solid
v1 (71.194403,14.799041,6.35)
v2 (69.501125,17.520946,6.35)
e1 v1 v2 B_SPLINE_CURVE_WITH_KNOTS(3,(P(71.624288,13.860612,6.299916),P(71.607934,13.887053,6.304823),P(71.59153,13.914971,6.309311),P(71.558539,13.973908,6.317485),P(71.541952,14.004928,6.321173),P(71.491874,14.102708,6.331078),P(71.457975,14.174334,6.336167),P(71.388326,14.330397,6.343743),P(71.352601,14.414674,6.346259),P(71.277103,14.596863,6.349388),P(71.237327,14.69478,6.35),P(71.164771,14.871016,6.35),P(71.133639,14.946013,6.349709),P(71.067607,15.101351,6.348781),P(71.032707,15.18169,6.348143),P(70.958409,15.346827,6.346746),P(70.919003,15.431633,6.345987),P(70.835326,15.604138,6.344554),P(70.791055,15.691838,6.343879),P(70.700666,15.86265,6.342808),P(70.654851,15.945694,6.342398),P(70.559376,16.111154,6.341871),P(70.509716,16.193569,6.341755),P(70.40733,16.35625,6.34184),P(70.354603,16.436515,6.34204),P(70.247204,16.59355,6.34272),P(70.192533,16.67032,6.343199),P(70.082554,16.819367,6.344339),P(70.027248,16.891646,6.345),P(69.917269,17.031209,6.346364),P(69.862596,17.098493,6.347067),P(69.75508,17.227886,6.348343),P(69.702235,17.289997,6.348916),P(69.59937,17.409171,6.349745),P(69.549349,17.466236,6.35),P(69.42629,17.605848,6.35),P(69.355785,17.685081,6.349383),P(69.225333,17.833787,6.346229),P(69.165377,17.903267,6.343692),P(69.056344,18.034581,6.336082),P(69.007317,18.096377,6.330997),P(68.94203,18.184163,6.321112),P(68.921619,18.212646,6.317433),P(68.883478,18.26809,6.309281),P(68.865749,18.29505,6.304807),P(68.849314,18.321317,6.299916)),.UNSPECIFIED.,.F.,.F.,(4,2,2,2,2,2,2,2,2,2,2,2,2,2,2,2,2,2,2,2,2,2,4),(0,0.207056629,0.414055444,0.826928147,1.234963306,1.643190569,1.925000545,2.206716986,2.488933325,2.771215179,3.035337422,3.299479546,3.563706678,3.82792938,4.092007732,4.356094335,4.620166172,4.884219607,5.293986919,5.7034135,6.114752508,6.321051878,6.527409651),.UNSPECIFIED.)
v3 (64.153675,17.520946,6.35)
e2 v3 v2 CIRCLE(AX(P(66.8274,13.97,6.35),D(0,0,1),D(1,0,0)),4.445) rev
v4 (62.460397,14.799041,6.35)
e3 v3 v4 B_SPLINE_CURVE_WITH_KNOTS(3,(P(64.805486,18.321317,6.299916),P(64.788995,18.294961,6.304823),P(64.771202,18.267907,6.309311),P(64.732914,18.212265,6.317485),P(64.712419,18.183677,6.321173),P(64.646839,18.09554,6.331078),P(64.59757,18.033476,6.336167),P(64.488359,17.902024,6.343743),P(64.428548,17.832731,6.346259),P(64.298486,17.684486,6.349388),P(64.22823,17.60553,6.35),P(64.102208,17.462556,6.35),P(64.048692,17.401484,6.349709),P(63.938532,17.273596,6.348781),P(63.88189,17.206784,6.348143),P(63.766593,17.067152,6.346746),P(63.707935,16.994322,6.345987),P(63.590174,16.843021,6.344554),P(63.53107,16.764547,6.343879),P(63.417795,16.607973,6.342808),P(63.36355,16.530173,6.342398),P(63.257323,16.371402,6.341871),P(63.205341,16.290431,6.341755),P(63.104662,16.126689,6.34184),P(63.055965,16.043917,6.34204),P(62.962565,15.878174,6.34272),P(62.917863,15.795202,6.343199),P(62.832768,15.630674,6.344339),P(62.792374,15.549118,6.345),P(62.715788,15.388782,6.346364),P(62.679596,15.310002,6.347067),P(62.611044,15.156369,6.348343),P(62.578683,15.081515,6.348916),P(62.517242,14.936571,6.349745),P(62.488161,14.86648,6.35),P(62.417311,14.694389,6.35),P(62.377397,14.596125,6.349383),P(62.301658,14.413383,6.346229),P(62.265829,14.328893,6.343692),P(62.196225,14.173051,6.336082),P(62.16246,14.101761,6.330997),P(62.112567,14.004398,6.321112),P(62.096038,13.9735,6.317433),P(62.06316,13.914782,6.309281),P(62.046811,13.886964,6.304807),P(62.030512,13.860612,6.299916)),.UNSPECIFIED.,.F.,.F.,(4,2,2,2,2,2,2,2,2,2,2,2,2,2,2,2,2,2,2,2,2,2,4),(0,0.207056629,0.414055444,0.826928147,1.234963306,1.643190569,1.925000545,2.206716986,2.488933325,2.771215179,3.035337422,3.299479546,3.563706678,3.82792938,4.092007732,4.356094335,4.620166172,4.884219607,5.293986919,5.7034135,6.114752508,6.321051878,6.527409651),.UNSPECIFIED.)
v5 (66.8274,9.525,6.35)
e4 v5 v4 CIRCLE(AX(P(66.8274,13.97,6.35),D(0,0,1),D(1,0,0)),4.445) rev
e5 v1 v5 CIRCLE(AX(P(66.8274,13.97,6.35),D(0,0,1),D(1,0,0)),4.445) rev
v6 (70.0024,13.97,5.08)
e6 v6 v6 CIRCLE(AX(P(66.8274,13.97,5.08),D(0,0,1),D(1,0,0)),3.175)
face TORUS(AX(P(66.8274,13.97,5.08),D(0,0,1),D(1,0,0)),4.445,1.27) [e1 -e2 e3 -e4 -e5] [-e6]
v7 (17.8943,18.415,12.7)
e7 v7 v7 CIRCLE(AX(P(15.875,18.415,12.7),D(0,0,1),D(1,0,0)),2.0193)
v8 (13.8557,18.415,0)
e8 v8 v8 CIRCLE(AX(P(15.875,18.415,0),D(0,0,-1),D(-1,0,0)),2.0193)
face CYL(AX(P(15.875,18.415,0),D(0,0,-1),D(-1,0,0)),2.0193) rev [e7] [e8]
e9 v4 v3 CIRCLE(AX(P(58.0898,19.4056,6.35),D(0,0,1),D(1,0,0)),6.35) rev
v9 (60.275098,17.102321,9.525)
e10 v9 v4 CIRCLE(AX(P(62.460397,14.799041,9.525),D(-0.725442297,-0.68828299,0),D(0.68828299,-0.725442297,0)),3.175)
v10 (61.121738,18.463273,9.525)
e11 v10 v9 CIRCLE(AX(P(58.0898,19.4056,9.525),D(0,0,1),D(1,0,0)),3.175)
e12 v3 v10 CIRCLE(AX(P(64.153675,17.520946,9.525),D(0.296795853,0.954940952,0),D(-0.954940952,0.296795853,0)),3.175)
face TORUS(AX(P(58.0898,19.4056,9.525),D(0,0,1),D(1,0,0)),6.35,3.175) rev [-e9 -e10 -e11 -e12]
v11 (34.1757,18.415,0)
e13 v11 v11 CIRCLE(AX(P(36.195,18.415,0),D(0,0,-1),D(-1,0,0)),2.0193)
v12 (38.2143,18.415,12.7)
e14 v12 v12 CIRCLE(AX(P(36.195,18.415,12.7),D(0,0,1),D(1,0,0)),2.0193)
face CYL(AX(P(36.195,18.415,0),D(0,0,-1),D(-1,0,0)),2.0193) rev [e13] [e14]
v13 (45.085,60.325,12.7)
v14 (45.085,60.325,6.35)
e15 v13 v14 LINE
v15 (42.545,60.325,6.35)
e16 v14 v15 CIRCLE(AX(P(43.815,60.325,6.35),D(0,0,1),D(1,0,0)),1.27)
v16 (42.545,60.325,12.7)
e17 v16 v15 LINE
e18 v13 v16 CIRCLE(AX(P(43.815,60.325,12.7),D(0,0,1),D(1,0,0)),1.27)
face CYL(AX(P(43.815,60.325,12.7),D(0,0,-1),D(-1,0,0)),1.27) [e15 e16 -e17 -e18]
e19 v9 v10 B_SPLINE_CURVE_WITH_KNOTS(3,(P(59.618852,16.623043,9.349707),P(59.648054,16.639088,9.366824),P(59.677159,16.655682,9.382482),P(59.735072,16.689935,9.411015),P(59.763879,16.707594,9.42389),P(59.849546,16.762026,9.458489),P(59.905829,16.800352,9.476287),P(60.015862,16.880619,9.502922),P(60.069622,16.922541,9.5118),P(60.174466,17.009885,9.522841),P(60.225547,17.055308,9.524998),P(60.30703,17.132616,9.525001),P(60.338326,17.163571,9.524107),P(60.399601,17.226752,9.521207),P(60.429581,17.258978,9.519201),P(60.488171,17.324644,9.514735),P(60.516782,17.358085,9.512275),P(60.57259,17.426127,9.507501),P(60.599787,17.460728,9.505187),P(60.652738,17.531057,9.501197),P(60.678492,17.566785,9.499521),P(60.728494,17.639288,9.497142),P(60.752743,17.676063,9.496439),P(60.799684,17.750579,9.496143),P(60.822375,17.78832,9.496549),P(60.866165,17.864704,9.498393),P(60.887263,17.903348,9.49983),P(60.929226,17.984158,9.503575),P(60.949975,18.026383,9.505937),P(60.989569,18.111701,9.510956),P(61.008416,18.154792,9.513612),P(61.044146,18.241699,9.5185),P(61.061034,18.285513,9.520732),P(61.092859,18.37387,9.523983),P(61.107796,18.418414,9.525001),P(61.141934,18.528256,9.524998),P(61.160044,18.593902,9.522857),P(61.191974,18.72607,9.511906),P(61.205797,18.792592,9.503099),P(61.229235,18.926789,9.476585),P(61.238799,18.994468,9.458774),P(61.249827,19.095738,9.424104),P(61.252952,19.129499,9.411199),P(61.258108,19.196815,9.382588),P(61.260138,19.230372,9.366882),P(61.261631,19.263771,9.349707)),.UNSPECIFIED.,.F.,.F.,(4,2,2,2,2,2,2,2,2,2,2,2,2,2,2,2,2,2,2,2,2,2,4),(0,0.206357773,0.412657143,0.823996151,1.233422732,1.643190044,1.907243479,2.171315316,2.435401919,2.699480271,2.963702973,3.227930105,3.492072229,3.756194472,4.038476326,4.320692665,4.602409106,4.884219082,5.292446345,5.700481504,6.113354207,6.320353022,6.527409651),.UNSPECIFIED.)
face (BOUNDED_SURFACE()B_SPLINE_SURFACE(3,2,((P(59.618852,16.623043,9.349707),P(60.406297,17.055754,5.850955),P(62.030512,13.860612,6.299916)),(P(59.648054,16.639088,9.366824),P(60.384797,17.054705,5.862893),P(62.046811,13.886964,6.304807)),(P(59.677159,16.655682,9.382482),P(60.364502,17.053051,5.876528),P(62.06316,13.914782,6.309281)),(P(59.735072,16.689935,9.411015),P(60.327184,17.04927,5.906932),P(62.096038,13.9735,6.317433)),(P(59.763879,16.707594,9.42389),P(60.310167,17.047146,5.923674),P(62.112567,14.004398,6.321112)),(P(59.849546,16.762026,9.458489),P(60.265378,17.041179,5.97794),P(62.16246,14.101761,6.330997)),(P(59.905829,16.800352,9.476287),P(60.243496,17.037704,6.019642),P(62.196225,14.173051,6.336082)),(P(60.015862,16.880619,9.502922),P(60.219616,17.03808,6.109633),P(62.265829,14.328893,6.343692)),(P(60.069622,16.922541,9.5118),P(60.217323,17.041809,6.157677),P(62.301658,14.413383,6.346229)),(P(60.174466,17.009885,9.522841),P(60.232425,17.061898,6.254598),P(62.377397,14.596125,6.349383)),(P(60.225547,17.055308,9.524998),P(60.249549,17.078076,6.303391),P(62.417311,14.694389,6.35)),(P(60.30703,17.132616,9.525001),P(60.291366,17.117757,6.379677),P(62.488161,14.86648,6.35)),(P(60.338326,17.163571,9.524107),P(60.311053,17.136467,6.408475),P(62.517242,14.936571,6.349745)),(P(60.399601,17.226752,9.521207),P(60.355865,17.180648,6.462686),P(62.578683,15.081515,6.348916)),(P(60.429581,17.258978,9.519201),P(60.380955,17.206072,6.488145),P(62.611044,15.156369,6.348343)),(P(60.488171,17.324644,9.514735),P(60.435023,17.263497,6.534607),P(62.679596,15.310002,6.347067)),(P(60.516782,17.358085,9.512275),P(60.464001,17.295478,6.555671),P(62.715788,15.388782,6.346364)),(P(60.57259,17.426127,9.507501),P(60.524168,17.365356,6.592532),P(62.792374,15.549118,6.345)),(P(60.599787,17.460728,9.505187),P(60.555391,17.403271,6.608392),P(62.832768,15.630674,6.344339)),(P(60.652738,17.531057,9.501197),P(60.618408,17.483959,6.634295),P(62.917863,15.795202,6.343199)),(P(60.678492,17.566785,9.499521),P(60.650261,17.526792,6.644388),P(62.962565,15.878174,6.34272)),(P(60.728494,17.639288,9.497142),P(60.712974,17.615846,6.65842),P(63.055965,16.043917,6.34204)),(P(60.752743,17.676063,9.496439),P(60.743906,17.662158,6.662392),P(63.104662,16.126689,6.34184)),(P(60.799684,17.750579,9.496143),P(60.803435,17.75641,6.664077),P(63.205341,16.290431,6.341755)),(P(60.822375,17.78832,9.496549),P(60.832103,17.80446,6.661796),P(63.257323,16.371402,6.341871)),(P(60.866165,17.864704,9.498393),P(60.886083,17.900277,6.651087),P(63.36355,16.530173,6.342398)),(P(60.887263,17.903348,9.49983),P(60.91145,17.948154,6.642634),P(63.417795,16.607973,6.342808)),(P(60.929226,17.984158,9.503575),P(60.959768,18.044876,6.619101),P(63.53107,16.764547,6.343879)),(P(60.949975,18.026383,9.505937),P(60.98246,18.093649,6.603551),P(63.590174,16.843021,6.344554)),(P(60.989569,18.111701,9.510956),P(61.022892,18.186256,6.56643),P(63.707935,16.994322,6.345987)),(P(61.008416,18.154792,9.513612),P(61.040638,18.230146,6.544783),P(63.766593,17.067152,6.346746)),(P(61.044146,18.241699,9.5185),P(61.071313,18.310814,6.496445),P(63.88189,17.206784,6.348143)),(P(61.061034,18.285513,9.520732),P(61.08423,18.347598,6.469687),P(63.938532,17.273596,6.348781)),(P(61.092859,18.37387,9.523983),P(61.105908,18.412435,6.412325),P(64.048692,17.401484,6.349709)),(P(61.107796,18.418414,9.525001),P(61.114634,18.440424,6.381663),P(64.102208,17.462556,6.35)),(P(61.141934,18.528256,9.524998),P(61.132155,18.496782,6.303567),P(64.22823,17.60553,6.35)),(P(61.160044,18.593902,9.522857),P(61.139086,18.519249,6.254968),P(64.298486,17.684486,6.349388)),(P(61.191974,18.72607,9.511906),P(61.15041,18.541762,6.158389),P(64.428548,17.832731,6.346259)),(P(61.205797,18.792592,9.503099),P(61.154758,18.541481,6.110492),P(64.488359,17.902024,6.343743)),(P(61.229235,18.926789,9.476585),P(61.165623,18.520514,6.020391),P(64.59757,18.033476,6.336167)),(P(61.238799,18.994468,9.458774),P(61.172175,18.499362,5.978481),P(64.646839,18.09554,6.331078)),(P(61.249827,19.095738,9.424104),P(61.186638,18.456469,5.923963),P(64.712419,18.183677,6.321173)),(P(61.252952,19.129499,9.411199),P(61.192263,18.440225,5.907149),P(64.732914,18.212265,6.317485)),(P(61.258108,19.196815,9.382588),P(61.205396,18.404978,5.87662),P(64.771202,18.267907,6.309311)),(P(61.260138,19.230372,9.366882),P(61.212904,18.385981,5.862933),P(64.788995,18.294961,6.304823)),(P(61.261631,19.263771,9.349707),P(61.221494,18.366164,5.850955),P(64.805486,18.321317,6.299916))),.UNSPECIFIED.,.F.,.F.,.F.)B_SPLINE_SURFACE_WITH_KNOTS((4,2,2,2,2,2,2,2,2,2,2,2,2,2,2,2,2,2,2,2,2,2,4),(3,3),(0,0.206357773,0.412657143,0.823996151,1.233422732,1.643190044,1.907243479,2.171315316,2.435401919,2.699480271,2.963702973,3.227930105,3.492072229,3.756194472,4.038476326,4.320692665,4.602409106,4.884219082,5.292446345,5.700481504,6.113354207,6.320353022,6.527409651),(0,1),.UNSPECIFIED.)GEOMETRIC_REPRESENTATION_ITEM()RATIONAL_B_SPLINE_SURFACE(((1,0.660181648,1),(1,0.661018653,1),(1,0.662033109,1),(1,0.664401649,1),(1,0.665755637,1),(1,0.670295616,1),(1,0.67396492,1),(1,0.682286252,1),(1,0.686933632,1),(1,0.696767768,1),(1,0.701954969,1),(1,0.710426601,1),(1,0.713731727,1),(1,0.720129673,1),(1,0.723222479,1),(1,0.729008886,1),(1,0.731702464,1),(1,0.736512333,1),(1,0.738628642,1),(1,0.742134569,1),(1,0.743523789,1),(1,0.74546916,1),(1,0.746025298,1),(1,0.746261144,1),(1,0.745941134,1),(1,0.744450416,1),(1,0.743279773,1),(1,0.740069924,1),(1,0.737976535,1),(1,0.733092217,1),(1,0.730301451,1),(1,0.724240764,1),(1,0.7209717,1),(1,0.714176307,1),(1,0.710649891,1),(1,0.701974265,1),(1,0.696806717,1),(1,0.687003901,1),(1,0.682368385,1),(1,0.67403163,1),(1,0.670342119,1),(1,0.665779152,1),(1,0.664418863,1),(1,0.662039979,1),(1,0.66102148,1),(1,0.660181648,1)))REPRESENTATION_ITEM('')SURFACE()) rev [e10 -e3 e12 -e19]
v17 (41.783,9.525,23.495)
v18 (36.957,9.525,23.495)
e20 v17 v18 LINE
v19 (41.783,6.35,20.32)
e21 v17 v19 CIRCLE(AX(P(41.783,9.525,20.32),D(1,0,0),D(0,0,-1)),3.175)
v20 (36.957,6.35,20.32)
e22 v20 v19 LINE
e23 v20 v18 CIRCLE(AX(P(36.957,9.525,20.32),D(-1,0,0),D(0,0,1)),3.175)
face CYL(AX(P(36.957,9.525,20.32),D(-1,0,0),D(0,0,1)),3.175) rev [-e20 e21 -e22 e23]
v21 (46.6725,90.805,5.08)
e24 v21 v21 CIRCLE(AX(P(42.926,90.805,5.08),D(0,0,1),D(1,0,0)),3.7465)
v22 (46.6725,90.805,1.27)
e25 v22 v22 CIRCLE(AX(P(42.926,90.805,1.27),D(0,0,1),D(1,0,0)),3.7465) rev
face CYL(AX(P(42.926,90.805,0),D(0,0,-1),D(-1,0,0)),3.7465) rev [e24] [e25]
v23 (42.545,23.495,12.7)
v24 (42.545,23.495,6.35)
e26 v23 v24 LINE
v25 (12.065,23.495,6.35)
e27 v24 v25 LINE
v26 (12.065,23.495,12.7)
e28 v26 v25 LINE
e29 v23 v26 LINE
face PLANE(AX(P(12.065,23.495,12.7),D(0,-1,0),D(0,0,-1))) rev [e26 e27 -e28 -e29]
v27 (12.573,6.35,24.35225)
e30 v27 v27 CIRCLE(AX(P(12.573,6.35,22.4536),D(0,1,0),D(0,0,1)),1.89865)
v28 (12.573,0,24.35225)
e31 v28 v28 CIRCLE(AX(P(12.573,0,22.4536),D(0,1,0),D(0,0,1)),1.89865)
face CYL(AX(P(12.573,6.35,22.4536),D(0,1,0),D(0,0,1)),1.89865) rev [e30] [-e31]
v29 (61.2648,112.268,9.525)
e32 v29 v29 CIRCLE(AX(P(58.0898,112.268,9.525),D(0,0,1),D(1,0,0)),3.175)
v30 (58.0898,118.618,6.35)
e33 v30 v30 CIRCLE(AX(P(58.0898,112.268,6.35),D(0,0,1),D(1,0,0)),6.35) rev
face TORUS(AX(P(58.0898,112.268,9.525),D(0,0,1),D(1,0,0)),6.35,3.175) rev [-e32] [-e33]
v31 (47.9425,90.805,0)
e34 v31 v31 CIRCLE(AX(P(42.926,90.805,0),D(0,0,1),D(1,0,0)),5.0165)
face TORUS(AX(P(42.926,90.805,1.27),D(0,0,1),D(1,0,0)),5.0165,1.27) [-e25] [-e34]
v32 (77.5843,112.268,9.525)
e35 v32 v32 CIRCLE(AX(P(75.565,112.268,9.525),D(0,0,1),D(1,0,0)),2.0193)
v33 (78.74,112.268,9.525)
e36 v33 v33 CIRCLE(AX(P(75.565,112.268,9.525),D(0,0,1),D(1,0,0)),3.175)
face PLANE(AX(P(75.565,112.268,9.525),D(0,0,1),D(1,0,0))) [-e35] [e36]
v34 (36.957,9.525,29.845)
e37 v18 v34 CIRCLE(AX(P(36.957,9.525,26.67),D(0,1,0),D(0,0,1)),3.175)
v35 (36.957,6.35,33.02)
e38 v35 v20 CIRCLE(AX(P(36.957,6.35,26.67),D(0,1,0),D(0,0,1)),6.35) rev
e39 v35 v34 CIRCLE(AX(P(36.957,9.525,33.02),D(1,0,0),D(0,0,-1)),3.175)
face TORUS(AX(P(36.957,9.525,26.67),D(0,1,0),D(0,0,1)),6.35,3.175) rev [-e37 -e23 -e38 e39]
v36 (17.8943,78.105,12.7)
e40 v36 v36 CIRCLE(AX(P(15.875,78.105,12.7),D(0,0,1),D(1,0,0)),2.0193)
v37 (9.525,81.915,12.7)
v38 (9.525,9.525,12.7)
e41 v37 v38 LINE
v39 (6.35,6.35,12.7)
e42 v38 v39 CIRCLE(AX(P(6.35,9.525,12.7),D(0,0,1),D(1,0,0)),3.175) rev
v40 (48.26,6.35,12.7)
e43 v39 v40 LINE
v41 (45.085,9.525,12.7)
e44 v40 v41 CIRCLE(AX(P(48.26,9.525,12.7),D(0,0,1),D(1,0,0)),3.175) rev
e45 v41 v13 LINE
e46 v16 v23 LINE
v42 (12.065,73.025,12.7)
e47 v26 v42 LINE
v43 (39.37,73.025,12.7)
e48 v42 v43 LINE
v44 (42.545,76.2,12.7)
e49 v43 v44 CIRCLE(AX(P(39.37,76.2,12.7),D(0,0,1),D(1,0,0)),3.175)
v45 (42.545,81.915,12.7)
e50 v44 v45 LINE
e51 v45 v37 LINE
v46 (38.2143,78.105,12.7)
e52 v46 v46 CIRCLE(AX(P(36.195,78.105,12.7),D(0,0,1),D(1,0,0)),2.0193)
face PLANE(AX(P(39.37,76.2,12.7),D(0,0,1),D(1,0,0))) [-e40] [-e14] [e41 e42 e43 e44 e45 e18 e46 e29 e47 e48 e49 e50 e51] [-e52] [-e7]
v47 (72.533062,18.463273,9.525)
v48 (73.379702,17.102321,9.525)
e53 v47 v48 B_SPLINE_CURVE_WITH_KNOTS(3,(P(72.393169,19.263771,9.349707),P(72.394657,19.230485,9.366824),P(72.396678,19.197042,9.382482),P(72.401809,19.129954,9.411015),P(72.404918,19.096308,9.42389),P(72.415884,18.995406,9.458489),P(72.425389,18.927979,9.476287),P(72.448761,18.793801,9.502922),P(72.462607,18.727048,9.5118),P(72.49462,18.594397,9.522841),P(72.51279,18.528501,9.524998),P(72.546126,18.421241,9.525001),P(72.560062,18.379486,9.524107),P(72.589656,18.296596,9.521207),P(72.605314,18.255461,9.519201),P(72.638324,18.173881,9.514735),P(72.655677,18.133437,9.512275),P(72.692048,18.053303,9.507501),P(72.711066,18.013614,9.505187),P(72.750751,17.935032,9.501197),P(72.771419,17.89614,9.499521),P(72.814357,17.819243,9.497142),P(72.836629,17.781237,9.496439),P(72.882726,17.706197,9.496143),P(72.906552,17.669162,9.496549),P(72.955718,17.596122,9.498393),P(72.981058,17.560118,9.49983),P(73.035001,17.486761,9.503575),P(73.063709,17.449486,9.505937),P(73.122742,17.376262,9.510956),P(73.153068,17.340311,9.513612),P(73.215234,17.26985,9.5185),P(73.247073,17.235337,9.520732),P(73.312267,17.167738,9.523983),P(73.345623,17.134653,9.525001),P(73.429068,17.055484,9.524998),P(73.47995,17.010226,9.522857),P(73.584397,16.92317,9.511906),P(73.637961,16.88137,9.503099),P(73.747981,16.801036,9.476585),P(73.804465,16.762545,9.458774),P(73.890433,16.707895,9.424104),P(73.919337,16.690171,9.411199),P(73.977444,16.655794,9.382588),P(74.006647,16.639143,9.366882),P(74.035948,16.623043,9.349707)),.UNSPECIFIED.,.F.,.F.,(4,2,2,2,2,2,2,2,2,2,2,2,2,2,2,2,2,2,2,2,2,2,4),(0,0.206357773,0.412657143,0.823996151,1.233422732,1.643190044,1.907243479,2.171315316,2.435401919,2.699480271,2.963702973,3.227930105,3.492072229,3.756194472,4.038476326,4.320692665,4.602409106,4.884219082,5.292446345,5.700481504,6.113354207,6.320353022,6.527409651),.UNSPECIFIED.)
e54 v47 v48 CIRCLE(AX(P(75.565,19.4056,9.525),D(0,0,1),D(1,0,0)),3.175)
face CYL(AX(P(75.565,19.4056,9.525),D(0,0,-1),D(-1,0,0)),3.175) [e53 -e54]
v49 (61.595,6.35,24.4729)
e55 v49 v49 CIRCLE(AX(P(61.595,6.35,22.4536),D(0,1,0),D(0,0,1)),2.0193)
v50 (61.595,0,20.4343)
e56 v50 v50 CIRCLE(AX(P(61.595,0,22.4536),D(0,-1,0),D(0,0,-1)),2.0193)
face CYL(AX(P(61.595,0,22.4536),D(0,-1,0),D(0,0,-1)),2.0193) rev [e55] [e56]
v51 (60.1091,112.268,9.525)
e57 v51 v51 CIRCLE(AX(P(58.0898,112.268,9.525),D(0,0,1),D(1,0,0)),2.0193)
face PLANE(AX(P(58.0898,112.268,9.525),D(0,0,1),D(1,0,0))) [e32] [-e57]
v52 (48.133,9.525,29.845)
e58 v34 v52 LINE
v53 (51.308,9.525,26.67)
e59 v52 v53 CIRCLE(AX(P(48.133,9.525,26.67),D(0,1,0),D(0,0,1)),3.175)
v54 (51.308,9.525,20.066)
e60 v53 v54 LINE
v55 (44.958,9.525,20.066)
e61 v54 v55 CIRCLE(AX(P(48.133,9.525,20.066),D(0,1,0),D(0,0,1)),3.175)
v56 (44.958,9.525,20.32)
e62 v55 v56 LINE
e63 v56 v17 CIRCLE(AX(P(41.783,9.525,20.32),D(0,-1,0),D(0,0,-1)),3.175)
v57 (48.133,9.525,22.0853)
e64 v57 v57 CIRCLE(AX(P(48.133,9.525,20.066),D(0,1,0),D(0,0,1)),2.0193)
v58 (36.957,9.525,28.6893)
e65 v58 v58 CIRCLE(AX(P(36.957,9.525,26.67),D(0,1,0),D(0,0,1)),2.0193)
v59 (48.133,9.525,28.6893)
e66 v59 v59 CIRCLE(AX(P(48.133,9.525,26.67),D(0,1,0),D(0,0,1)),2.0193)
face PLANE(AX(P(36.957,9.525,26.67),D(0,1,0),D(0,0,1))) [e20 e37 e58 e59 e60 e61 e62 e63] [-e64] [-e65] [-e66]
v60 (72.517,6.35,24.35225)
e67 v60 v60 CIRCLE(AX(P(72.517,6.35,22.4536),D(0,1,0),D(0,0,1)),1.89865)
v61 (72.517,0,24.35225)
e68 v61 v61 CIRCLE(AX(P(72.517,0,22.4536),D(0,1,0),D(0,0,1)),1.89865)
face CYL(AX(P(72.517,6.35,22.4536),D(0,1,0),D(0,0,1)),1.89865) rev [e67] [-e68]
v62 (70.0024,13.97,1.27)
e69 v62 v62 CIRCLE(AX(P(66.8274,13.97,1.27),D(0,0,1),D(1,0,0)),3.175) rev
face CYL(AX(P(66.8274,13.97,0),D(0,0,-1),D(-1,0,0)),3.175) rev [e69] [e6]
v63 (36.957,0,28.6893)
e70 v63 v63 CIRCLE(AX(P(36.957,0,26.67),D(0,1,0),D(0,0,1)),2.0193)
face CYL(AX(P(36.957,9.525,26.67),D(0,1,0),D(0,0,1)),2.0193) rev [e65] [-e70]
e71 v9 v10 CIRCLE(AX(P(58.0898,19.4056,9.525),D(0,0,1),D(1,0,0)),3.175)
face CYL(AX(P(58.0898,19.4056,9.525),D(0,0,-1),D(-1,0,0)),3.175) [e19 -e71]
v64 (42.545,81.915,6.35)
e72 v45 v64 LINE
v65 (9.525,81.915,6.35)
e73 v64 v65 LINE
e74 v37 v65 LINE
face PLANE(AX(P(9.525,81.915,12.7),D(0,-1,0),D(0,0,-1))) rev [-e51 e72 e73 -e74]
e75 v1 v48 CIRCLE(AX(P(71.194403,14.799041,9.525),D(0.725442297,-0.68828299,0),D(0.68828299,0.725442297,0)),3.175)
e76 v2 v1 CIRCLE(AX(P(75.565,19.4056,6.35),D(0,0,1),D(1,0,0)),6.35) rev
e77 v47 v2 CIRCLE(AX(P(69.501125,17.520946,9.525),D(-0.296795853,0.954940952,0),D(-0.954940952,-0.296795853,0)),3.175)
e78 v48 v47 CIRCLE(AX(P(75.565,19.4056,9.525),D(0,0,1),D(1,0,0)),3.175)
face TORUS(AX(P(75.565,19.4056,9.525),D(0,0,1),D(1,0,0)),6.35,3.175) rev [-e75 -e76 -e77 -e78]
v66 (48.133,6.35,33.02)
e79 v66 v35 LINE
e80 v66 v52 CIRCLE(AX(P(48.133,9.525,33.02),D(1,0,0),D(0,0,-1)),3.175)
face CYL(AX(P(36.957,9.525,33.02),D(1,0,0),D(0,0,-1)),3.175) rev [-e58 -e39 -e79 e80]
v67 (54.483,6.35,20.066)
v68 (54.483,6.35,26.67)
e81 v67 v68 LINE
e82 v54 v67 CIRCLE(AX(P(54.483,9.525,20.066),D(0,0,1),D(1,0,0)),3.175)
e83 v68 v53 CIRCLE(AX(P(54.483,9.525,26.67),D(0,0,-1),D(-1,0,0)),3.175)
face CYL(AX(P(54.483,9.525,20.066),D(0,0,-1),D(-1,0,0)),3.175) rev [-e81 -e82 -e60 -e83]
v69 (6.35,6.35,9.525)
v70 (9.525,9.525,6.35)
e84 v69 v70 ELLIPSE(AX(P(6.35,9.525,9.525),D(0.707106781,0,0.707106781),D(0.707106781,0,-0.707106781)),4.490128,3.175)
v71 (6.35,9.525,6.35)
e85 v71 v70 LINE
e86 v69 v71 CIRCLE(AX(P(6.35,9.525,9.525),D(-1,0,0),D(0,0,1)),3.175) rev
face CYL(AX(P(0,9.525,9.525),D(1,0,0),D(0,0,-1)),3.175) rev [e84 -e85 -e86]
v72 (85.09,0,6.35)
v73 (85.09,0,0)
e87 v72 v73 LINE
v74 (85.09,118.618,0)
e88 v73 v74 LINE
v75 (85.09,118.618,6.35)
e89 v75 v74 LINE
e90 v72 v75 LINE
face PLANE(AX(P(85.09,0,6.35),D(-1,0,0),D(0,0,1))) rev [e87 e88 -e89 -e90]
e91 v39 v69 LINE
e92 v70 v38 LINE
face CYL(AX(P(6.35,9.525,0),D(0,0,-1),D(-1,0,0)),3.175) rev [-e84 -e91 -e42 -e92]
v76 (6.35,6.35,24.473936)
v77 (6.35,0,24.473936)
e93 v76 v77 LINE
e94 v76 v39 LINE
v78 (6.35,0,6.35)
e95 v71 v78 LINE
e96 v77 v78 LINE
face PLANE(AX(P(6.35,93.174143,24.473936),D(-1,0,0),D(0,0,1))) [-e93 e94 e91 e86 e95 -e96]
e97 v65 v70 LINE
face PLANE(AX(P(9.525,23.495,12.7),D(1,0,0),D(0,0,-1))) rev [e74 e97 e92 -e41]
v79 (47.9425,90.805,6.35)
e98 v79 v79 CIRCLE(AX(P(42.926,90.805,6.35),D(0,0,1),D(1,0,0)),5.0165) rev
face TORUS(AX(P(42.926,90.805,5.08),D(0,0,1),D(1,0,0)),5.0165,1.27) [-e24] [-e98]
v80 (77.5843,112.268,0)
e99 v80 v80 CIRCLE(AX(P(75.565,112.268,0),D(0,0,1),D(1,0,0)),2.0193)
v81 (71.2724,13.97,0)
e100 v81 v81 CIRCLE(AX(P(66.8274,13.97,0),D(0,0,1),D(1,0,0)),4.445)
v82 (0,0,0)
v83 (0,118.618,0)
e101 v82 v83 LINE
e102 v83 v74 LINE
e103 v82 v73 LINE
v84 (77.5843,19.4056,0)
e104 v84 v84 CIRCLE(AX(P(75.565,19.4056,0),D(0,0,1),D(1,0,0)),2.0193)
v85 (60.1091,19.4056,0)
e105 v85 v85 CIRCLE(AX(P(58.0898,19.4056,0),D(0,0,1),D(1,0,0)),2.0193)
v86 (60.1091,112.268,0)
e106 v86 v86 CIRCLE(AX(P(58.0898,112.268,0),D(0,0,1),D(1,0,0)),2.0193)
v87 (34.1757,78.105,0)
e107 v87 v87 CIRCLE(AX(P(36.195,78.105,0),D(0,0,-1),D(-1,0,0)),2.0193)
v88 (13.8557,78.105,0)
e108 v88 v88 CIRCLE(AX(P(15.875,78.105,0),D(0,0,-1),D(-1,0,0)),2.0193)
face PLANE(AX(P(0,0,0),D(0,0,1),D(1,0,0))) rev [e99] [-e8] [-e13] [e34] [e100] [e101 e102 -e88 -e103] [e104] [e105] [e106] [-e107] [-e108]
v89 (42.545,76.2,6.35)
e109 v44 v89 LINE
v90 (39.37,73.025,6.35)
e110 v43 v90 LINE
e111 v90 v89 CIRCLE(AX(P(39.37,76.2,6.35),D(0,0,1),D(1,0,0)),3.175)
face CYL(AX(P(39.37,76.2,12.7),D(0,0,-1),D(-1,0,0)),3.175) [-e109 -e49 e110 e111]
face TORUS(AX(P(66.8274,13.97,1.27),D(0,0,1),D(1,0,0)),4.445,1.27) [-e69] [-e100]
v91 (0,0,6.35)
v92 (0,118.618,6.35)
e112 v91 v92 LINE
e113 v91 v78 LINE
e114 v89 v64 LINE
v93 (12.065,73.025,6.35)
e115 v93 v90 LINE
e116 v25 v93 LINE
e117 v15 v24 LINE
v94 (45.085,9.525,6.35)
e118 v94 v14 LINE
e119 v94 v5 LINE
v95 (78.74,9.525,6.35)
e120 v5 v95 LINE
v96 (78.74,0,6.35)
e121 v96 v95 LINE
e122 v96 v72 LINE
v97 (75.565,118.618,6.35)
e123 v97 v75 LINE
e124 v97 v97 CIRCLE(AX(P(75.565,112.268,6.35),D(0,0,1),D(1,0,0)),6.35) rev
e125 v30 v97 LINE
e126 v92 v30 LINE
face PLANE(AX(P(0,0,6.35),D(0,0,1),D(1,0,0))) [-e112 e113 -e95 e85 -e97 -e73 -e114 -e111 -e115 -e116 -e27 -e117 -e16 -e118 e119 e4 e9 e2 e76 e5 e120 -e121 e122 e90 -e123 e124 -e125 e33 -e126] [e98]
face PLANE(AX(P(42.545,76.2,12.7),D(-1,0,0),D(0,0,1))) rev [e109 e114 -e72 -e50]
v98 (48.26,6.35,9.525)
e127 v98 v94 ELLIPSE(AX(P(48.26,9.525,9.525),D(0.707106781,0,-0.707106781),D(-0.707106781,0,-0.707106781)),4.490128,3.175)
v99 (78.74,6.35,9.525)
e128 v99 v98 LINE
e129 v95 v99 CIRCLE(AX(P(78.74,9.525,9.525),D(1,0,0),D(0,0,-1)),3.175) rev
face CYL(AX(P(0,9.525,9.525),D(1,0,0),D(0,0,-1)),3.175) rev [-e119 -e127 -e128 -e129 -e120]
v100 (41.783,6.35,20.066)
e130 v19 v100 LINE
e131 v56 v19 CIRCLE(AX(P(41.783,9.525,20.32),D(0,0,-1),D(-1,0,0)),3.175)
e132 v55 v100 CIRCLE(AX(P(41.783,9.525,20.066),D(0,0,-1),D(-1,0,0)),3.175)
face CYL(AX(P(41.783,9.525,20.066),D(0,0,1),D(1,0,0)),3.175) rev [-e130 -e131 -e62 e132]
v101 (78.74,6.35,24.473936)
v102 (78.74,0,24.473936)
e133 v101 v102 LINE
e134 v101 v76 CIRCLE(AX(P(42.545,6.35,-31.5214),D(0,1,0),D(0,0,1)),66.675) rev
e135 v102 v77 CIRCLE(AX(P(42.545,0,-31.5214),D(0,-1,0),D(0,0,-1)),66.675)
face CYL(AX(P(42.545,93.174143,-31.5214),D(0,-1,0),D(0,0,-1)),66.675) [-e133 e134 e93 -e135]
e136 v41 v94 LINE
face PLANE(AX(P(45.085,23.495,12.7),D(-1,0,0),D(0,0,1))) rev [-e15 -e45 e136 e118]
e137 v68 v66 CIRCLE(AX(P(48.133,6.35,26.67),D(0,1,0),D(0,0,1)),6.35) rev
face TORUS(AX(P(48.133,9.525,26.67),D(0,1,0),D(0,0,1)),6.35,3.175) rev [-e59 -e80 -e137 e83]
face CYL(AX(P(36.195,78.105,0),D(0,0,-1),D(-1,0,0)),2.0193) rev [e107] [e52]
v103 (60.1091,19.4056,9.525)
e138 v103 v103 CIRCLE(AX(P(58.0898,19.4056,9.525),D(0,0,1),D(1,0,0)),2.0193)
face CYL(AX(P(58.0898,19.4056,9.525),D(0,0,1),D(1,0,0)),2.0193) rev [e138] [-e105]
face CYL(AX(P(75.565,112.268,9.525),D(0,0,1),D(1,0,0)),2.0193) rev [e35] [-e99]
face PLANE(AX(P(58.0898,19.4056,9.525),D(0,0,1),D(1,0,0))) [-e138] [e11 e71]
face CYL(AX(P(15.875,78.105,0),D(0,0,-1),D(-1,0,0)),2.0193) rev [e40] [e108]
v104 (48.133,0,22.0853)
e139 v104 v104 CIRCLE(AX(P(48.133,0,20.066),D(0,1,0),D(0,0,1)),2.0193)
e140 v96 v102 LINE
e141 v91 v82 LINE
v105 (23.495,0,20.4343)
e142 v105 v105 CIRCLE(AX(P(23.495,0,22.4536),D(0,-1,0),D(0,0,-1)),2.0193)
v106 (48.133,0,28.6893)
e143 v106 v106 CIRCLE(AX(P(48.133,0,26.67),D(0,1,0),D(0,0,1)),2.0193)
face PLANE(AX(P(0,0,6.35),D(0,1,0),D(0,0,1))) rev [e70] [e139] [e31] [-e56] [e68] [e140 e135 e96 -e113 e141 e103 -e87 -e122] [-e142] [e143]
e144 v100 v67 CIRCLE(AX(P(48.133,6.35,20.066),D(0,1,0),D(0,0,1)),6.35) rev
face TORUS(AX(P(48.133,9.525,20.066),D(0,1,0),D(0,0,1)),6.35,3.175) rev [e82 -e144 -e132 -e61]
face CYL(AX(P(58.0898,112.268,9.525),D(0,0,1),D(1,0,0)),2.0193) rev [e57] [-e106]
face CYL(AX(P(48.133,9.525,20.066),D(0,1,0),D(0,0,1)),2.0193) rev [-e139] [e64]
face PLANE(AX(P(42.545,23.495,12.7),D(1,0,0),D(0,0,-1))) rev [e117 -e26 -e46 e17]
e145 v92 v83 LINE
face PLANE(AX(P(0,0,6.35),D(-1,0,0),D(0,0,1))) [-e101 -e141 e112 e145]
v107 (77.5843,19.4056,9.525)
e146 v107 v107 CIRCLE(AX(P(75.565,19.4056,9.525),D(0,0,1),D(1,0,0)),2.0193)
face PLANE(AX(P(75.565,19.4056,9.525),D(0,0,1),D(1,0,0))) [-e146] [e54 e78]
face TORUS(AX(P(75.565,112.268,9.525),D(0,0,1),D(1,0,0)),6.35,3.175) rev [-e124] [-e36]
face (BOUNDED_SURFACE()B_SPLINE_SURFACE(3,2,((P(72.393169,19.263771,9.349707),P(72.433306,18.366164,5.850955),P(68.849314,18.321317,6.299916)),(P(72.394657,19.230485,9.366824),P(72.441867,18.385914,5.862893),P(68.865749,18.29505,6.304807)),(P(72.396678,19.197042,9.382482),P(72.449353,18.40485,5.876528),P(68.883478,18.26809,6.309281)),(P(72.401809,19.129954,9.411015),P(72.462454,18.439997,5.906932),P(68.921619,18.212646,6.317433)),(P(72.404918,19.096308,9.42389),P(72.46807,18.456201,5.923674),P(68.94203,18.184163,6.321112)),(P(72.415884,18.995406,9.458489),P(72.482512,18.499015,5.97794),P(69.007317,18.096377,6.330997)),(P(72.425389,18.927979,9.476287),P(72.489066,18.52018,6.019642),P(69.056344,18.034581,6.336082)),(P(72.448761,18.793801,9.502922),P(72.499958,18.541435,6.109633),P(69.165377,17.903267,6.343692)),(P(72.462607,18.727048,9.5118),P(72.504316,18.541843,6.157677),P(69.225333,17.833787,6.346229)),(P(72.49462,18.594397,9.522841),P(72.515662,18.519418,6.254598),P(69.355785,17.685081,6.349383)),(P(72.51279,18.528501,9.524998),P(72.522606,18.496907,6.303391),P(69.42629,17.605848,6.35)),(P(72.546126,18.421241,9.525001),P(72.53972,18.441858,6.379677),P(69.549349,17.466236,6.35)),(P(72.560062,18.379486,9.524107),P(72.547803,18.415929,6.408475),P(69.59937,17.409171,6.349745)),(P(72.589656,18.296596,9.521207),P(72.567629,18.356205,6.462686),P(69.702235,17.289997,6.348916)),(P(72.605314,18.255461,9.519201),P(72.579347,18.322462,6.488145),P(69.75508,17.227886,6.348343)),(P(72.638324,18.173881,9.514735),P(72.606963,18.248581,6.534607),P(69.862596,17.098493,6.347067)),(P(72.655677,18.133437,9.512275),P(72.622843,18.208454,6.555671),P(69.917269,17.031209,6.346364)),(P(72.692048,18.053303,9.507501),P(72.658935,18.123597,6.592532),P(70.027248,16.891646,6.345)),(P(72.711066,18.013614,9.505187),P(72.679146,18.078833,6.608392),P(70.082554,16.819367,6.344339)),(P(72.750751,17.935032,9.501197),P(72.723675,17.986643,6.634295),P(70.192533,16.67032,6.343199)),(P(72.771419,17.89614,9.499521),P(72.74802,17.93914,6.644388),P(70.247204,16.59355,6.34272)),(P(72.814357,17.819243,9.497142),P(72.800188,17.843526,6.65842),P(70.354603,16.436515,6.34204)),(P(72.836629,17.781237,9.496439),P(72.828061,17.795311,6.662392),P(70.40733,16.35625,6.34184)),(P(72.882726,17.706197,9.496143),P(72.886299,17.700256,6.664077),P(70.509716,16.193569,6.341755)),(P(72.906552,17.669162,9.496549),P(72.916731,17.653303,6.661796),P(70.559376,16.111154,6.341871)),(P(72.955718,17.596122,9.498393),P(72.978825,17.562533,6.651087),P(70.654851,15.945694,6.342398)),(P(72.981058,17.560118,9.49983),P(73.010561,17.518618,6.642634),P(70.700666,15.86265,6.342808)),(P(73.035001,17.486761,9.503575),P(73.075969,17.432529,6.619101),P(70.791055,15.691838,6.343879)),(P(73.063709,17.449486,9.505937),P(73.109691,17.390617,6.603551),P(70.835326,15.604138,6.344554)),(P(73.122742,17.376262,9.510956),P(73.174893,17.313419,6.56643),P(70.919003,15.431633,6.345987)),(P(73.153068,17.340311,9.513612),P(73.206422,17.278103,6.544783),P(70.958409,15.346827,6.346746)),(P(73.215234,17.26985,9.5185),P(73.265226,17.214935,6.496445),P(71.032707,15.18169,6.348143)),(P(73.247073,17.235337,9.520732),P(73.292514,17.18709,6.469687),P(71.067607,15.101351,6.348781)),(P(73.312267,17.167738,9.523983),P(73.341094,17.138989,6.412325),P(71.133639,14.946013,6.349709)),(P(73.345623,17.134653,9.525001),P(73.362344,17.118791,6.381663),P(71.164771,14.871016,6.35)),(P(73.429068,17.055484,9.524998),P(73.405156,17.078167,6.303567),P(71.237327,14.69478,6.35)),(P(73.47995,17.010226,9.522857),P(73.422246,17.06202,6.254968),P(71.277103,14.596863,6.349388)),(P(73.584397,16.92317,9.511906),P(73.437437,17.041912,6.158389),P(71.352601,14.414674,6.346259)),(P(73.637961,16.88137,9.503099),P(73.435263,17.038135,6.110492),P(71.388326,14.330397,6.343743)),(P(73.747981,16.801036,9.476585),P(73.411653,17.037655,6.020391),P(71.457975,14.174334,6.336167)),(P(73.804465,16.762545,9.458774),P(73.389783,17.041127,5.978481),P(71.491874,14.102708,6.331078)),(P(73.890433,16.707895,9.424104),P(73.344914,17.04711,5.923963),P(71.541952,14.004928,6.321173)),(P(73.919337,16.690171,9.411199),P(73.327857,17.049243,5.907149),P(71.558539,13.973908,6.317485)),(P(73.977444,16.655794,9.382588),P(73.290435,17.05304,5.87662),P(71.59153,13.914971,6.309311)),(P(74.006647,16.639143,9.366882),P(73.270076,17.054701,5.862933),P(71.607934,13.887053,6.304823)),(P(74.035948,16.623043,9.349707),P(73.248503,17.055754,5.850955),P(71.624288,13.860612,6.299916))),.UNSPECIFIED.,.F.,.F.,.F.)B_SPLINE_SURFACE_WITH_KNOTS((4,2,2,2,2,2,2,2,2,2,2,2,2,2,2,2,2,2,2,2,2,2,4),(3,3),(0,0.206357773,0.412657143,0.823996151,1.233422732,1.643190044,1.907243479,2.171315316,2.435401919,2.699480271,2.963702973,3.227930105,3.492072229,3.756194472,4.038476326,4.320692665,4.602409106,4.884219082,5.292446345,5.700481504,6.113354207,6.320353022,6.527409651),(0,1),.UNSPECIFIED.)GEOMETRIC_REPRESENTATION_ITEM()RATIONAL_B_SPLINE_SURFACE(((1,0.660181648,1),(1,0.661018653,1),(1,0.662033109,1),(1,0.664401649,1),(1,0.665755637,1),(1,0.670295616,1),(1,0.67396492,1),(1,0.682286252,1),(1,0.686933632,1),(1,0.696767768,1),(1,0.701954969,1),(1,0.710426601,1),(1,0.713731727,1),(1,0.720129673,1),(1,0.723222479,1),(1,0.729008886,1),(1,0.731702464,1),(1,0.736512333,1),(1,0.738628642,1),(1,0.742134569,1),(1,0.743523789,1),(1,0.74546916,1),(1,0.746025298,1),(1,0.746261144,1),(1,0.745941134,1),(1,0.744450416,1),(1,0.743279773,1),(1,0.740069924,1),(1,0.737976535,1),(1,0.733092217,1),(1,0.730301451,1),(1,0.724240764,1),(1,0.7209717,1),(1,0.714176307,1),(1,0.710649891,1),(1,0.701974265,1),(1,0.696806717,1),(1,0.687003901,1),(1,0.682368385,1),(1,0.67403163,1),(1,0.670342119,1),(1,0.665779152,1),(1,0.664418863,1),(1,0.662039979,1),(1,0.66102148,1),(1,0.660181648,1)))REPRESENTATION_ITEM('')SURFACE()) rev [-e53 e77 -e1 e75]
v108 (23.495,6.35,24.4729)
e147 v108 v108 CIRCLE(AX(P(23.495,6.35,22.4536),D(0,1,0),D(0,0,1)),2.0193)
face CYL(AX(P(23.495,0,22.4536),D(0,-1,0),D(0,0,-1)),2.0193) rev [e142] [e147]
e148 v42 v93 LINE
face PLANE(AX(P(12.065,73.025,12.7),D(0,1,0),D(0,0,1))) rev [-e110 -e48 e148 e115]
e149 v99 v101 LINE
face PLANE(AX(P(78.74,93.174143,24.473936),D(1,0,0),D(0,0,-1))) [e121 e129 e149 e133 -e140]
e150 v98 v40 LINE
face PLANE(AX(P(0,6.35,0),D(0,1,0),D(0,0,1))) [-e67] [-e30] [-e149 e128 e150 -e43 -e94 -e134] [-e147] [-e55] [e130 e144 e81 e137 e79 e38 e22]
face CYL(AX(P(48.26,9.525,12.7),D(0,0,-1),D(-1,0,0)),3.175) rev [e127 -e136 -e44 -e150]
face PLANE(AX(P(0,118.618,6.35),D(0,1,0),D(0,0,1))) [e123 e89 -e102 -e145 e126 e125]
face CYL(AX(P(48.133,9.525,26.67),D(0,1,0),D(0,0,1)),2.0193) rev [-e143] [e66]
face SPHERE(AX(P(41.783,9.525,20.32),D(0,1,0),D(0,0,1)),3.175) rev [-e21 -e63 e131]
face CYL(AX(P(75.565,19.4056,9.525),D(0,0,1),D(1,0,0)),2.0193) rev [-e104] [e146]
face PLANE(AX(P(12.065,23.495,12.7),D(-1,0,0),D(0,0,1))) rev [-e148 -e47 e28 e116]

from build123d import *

# Parameters (mm, degrees)
SKETCH1_W                         = 85.09
SKETCH1_H                         = 118.618
BOSS1_MAIN_PLATE_DEPTH            = 6.35
BOSS2_BOTTOM_PLATE_DEPTH          = 6.35
BOSS3_BATTERY_PLATE_DEPTH         = 6.35
FILLET1_PLATE_CONVERGENCE_R       = 3.175
HOLES1_MAIN_PLATE_D               = 4.0386
HOLES2_TOP_MAIN_PLATE_D           = 7.493
HOLES3_BOT_MAIN_PLATE_D           = 6.35
FILLET1_HOLES_MAIN_PLATE_R        = 1.27
HOLES4_BOTTOM_PLATE_D             = 4.0386
HOLES6_D                          = 3.7973
BOSS4_BOTTOM_PLATE_STANDOFF_DEPTH = 3.175
HOLES7_BOTTOM_PLATE_D             = 4.0386
FILLET2_BOTTOM_PLATE_R            = 3.175
SKETCH21_R                        = 3.175
BOSS5_MAIN_PLATE_STANDOFFS_DEPTH  = 3.175
FILLET3_MAIN_PLATE_STANDOFFS_R    = 3.175
HOLES8_MAIN_PLATE_D               = 4.0386


with BuildPart() as part:
    # Sketch1 → Boss1 - Main Plate (new body)
    with BuildSketch(Plane.XY):
        with Locations((42.545, 59.309)):
            Rectangle(SKETCH1_W, SKETCH1_H)
    extrude(amount=BOSS1_MAIN_PLATE_DEPTH)

    # Sketch2 → Boss2 - Bottom Plate (add)
    with BuildSketch(Plane.XZ):
        with BuildLine():
            Line((6.35, 24.47393552), (6.35, 0))
            Line((6.35, 0), (78.74, 0))
            Line((78.74, 0), (78.74, 24.47393552))
            ThreePointArc((78.74, 24.47393552), (42.545, 35.1536), (6.35, 24.47393552))
        make_face()
    extrude(amount=-BOSS2_BOTTOM_PLATE_DEPTH)

    # Sketch3 → Boss3 - Battery Plate (add)
    with BuildSketch(Plane.XY.offset(6.35)):
        with BuildLine():
            Line((9.525, 6.35), (45.085, 6.35))
            Line((45.085, 6.35), (45.085, 23.495))
            Line((45.085, 23.495), (45.085, 60.325))
            ThreePointArc((45.085, 60.325), (43.815, 61.595), (42.545, 60.325))
            Line((42.545, 60.325), (42.545, 23.495))
            Line((42.545, 23.495), (12.065, 23.495))
            Line((12.065, 23.495), (12.065, 73.025))
            Line((12.065, 73.025), (39.37, 73.025))
            ThreePointArc((39.37, 73.025), (41.61506403, 73.95493597), (42.545, 76.2))
            Line((42.545, 76.2), (42.545, 81.915))
            Line((42.545, 81.915), (9.525, 81.915))
            Line((9.525, 81.915), (9.525, 73.025))
            Line((9.525, 73.025), (9.525, 23.495))
            Line((9.525, 23.495), (9.525, 6.35))
        make_face()
    extrude(amount=BOSS3_BATTERY_PLATE_DEPTH)

    # Fillet1 - Plate Convergence
    fillet1_plate_convergence_edges = [part.edges().sort_by_distance(p)[0] for p in [
        (61.9125, 6.35, 6.35),
        (7.9375, 6.35, 6.35),
        (9.525, 6.35, 9.525),
        (45.085, 6.35, 9.525),
    ]]
    fillet(fillet1_plate_convergence_edges, radius=FILLET1_PLATE_CONVERGENCE_R - 0.0001)  # a hair under: the kernel refuses the full size

    # Holes1 - Main Plate (through all)
    with Locations(Plane(origin=(0, 0, 0), x_dir=(-1, 0, 0), z_dir=(0, 0, -1))):
        with Locations((-36.195, 18.415), (-15.875, 18.415), (-15.875, 78.105), (-36.195, 78.105)):
            Hole(HOLES1_MAIN_PLATE_D / 2)

    # Holes2 - Top Main Plate (through all)
    with Locations(Plane(origin=(0, 0, 0), x_dir=(-1, 0, 0), z_dir=(0, 0, -1))):
        with Locations((-42.926, 90.805)):
            Hole(HOLES2_TOP_MAIN_PLATE_D / 2)

    # Holes3 - Bot Main Plate (through all)
    with Locations(Plane(origin=(0, 0, 0), x_dir=(-1, 0, 0), z_dir=(0, 0, -1))):
        with Locations((-66.8274, 13.97)):
            Hole(HOLES3_BOT_MAIN_PLATE_D / 2)

    # Fillet1 - Holes Main Plate
    fillet1_holes_main_plate_edges = [part.edges().sort_by_distance(p)[0] for p in [
        (39.1795, 90.805, 6.35),
        (39.1795, 90.805, 0),
        (63.6524, 13.97, 6.35),
        (63.6524, 13.97, 0),
    ]]
    fillet(fillet1_holes_main_plate_edges, radius=FILLET1_HOLES_MAIN_PLATE_R)

    # Holes4 - Bottom Plate (through all)
    with Locations(Plane(origin=(0, 0, 0), x_dir=(-1, 0, 0), z_dir=(0, -1, 0))):
        with Locations((-23.495, -22.4536), (-61.595, -22.4536)):
            Hole(HOLES4_BOTTOM_PLATE_D / 2)

    # Holes6 (through all)
    with Locations(Plane(origin=(0, 6.35, 0), x_dir=(1, 0, 0), z_dir=(0, 1, 0))):
        with Locations((72.517, -22.4536), (12.573, -22.4536)):
            Hole(HOLES6_D / 2)

    # Sketch17 → Boss4 - Bottom Plate Standoff (add)
    with BuildSketch(Plane(origin=(0, 6.35, 0), x_dir=(1, 0, 0), z_dir=(0, 1, 0))):
        with BuildLine():
            Line((36.957, -23.495), (41.783, -23.495))
            ThreePointArc((41.783, -23.495), (44.02806403, -22.56506403), (44.958, -20.32))
            Line((44.958, -20.32), (44.958, -20.066))
            ThreePointArc((44.958, -20.066), (48.133, -16.891), (51.308, -20.066))
            Line((51.308, -20.066), (51.308, -26.67))
            ThreePointArc((51.308, -26.67), (50.37806403, -28.91506403), (48.133, -29.845))
            Line((48.133, -29.845), (36.957, -29.845))
            ThreePointArc((36.957, -29.845), (33.782, -26.67), (36.957, -23.495))
        make_face()
    extrude(amount=BOSS4_BOTTOM_PLATE_STANDOFF_DEPTH)

    # Holes7 - Bottom Plate (through all)
    with Locations(Plane(origin=(0, 9.525, 0), x_dir=(1, 0, 0), z_dir=(0, 1, 0))):
        with Locations((36.957, -26.67), (48.133, -26.67), (48.133, -20.066)):
            Hole(HOLES7_BOTTOM_PLATE_D / 2)

    # Fillet2 - Bottom Plate
    fillet2_bottom_plate_edges = [part.edges().sort_by_distance(p)[0] for p in [
        (39.37, 6.35, 23.495),
        (44.02806403, 6.35, 22.56506403),
        (44.958, 6.35, 20.193),
        (48.133, 6.35, 16.891),
        (51.308, 6.35, 23.368),
        (50.37806403, 6.35, 28.91506403),
        (33.782, 6.35, 26.67),
        (42.545, 6.35, 29.845),
    ]]
    fillet(fillet2_bottom_plate_edges, radius=FILLET2_BOTTOM_PLATE_R - 0.0001)  # a hair under: the kernel refuses the full size

    # Sketch21 → Boss5 - Main Plate Standoffs (add)
    with BuildSketch(Plane.XY.offset(6.35)):
        with Locations((58.0898, 112.268)):
            Circle(SKETCH21_R)
        with Locations((75.565, 112.268)):
            Circle(SKETCH21_R)
        with Locations((58.0898, 19.4056)):
            Circle(SKETCH21_R)
        with Locations((75.565, 19.4056)):
            Circle(SKETCH21_R)
    extrude(amount=BOSS5_MAIN_PLATE_STANDOFFS_DEPTH)

    # Fillet3 - Main Plate Standoffs
    fillet3_main_plate_standoffs_edges = [part.edges().sort_by_distance(p)[0] for p in [
        (54.9148, 112.268, 6.35),
        (72.39, 112.268, 6.35),
        (54.9148, 19.4056, 6.35),
        (72.39, 19.4056, 6.35),
    ]]
    fillet(fillet3_main_plate_standoffs_edges, radius=FILLET3_MAIN_PLATE_STANDOFFS_R - 0.0001)  # a hair under: the kernel refuses the full size

    # Holes8 - Main Plate (through all)
    with Locations(Plane.XY.offset(9.525)):
        with Locations((58.0898, 112.268), (75.565, 112.268), (75.565, 19.4056), (58.0898, 19.4056)):
            Hole(HOLES8_MAIN_PLATE_D / 2)


solid = part.part
